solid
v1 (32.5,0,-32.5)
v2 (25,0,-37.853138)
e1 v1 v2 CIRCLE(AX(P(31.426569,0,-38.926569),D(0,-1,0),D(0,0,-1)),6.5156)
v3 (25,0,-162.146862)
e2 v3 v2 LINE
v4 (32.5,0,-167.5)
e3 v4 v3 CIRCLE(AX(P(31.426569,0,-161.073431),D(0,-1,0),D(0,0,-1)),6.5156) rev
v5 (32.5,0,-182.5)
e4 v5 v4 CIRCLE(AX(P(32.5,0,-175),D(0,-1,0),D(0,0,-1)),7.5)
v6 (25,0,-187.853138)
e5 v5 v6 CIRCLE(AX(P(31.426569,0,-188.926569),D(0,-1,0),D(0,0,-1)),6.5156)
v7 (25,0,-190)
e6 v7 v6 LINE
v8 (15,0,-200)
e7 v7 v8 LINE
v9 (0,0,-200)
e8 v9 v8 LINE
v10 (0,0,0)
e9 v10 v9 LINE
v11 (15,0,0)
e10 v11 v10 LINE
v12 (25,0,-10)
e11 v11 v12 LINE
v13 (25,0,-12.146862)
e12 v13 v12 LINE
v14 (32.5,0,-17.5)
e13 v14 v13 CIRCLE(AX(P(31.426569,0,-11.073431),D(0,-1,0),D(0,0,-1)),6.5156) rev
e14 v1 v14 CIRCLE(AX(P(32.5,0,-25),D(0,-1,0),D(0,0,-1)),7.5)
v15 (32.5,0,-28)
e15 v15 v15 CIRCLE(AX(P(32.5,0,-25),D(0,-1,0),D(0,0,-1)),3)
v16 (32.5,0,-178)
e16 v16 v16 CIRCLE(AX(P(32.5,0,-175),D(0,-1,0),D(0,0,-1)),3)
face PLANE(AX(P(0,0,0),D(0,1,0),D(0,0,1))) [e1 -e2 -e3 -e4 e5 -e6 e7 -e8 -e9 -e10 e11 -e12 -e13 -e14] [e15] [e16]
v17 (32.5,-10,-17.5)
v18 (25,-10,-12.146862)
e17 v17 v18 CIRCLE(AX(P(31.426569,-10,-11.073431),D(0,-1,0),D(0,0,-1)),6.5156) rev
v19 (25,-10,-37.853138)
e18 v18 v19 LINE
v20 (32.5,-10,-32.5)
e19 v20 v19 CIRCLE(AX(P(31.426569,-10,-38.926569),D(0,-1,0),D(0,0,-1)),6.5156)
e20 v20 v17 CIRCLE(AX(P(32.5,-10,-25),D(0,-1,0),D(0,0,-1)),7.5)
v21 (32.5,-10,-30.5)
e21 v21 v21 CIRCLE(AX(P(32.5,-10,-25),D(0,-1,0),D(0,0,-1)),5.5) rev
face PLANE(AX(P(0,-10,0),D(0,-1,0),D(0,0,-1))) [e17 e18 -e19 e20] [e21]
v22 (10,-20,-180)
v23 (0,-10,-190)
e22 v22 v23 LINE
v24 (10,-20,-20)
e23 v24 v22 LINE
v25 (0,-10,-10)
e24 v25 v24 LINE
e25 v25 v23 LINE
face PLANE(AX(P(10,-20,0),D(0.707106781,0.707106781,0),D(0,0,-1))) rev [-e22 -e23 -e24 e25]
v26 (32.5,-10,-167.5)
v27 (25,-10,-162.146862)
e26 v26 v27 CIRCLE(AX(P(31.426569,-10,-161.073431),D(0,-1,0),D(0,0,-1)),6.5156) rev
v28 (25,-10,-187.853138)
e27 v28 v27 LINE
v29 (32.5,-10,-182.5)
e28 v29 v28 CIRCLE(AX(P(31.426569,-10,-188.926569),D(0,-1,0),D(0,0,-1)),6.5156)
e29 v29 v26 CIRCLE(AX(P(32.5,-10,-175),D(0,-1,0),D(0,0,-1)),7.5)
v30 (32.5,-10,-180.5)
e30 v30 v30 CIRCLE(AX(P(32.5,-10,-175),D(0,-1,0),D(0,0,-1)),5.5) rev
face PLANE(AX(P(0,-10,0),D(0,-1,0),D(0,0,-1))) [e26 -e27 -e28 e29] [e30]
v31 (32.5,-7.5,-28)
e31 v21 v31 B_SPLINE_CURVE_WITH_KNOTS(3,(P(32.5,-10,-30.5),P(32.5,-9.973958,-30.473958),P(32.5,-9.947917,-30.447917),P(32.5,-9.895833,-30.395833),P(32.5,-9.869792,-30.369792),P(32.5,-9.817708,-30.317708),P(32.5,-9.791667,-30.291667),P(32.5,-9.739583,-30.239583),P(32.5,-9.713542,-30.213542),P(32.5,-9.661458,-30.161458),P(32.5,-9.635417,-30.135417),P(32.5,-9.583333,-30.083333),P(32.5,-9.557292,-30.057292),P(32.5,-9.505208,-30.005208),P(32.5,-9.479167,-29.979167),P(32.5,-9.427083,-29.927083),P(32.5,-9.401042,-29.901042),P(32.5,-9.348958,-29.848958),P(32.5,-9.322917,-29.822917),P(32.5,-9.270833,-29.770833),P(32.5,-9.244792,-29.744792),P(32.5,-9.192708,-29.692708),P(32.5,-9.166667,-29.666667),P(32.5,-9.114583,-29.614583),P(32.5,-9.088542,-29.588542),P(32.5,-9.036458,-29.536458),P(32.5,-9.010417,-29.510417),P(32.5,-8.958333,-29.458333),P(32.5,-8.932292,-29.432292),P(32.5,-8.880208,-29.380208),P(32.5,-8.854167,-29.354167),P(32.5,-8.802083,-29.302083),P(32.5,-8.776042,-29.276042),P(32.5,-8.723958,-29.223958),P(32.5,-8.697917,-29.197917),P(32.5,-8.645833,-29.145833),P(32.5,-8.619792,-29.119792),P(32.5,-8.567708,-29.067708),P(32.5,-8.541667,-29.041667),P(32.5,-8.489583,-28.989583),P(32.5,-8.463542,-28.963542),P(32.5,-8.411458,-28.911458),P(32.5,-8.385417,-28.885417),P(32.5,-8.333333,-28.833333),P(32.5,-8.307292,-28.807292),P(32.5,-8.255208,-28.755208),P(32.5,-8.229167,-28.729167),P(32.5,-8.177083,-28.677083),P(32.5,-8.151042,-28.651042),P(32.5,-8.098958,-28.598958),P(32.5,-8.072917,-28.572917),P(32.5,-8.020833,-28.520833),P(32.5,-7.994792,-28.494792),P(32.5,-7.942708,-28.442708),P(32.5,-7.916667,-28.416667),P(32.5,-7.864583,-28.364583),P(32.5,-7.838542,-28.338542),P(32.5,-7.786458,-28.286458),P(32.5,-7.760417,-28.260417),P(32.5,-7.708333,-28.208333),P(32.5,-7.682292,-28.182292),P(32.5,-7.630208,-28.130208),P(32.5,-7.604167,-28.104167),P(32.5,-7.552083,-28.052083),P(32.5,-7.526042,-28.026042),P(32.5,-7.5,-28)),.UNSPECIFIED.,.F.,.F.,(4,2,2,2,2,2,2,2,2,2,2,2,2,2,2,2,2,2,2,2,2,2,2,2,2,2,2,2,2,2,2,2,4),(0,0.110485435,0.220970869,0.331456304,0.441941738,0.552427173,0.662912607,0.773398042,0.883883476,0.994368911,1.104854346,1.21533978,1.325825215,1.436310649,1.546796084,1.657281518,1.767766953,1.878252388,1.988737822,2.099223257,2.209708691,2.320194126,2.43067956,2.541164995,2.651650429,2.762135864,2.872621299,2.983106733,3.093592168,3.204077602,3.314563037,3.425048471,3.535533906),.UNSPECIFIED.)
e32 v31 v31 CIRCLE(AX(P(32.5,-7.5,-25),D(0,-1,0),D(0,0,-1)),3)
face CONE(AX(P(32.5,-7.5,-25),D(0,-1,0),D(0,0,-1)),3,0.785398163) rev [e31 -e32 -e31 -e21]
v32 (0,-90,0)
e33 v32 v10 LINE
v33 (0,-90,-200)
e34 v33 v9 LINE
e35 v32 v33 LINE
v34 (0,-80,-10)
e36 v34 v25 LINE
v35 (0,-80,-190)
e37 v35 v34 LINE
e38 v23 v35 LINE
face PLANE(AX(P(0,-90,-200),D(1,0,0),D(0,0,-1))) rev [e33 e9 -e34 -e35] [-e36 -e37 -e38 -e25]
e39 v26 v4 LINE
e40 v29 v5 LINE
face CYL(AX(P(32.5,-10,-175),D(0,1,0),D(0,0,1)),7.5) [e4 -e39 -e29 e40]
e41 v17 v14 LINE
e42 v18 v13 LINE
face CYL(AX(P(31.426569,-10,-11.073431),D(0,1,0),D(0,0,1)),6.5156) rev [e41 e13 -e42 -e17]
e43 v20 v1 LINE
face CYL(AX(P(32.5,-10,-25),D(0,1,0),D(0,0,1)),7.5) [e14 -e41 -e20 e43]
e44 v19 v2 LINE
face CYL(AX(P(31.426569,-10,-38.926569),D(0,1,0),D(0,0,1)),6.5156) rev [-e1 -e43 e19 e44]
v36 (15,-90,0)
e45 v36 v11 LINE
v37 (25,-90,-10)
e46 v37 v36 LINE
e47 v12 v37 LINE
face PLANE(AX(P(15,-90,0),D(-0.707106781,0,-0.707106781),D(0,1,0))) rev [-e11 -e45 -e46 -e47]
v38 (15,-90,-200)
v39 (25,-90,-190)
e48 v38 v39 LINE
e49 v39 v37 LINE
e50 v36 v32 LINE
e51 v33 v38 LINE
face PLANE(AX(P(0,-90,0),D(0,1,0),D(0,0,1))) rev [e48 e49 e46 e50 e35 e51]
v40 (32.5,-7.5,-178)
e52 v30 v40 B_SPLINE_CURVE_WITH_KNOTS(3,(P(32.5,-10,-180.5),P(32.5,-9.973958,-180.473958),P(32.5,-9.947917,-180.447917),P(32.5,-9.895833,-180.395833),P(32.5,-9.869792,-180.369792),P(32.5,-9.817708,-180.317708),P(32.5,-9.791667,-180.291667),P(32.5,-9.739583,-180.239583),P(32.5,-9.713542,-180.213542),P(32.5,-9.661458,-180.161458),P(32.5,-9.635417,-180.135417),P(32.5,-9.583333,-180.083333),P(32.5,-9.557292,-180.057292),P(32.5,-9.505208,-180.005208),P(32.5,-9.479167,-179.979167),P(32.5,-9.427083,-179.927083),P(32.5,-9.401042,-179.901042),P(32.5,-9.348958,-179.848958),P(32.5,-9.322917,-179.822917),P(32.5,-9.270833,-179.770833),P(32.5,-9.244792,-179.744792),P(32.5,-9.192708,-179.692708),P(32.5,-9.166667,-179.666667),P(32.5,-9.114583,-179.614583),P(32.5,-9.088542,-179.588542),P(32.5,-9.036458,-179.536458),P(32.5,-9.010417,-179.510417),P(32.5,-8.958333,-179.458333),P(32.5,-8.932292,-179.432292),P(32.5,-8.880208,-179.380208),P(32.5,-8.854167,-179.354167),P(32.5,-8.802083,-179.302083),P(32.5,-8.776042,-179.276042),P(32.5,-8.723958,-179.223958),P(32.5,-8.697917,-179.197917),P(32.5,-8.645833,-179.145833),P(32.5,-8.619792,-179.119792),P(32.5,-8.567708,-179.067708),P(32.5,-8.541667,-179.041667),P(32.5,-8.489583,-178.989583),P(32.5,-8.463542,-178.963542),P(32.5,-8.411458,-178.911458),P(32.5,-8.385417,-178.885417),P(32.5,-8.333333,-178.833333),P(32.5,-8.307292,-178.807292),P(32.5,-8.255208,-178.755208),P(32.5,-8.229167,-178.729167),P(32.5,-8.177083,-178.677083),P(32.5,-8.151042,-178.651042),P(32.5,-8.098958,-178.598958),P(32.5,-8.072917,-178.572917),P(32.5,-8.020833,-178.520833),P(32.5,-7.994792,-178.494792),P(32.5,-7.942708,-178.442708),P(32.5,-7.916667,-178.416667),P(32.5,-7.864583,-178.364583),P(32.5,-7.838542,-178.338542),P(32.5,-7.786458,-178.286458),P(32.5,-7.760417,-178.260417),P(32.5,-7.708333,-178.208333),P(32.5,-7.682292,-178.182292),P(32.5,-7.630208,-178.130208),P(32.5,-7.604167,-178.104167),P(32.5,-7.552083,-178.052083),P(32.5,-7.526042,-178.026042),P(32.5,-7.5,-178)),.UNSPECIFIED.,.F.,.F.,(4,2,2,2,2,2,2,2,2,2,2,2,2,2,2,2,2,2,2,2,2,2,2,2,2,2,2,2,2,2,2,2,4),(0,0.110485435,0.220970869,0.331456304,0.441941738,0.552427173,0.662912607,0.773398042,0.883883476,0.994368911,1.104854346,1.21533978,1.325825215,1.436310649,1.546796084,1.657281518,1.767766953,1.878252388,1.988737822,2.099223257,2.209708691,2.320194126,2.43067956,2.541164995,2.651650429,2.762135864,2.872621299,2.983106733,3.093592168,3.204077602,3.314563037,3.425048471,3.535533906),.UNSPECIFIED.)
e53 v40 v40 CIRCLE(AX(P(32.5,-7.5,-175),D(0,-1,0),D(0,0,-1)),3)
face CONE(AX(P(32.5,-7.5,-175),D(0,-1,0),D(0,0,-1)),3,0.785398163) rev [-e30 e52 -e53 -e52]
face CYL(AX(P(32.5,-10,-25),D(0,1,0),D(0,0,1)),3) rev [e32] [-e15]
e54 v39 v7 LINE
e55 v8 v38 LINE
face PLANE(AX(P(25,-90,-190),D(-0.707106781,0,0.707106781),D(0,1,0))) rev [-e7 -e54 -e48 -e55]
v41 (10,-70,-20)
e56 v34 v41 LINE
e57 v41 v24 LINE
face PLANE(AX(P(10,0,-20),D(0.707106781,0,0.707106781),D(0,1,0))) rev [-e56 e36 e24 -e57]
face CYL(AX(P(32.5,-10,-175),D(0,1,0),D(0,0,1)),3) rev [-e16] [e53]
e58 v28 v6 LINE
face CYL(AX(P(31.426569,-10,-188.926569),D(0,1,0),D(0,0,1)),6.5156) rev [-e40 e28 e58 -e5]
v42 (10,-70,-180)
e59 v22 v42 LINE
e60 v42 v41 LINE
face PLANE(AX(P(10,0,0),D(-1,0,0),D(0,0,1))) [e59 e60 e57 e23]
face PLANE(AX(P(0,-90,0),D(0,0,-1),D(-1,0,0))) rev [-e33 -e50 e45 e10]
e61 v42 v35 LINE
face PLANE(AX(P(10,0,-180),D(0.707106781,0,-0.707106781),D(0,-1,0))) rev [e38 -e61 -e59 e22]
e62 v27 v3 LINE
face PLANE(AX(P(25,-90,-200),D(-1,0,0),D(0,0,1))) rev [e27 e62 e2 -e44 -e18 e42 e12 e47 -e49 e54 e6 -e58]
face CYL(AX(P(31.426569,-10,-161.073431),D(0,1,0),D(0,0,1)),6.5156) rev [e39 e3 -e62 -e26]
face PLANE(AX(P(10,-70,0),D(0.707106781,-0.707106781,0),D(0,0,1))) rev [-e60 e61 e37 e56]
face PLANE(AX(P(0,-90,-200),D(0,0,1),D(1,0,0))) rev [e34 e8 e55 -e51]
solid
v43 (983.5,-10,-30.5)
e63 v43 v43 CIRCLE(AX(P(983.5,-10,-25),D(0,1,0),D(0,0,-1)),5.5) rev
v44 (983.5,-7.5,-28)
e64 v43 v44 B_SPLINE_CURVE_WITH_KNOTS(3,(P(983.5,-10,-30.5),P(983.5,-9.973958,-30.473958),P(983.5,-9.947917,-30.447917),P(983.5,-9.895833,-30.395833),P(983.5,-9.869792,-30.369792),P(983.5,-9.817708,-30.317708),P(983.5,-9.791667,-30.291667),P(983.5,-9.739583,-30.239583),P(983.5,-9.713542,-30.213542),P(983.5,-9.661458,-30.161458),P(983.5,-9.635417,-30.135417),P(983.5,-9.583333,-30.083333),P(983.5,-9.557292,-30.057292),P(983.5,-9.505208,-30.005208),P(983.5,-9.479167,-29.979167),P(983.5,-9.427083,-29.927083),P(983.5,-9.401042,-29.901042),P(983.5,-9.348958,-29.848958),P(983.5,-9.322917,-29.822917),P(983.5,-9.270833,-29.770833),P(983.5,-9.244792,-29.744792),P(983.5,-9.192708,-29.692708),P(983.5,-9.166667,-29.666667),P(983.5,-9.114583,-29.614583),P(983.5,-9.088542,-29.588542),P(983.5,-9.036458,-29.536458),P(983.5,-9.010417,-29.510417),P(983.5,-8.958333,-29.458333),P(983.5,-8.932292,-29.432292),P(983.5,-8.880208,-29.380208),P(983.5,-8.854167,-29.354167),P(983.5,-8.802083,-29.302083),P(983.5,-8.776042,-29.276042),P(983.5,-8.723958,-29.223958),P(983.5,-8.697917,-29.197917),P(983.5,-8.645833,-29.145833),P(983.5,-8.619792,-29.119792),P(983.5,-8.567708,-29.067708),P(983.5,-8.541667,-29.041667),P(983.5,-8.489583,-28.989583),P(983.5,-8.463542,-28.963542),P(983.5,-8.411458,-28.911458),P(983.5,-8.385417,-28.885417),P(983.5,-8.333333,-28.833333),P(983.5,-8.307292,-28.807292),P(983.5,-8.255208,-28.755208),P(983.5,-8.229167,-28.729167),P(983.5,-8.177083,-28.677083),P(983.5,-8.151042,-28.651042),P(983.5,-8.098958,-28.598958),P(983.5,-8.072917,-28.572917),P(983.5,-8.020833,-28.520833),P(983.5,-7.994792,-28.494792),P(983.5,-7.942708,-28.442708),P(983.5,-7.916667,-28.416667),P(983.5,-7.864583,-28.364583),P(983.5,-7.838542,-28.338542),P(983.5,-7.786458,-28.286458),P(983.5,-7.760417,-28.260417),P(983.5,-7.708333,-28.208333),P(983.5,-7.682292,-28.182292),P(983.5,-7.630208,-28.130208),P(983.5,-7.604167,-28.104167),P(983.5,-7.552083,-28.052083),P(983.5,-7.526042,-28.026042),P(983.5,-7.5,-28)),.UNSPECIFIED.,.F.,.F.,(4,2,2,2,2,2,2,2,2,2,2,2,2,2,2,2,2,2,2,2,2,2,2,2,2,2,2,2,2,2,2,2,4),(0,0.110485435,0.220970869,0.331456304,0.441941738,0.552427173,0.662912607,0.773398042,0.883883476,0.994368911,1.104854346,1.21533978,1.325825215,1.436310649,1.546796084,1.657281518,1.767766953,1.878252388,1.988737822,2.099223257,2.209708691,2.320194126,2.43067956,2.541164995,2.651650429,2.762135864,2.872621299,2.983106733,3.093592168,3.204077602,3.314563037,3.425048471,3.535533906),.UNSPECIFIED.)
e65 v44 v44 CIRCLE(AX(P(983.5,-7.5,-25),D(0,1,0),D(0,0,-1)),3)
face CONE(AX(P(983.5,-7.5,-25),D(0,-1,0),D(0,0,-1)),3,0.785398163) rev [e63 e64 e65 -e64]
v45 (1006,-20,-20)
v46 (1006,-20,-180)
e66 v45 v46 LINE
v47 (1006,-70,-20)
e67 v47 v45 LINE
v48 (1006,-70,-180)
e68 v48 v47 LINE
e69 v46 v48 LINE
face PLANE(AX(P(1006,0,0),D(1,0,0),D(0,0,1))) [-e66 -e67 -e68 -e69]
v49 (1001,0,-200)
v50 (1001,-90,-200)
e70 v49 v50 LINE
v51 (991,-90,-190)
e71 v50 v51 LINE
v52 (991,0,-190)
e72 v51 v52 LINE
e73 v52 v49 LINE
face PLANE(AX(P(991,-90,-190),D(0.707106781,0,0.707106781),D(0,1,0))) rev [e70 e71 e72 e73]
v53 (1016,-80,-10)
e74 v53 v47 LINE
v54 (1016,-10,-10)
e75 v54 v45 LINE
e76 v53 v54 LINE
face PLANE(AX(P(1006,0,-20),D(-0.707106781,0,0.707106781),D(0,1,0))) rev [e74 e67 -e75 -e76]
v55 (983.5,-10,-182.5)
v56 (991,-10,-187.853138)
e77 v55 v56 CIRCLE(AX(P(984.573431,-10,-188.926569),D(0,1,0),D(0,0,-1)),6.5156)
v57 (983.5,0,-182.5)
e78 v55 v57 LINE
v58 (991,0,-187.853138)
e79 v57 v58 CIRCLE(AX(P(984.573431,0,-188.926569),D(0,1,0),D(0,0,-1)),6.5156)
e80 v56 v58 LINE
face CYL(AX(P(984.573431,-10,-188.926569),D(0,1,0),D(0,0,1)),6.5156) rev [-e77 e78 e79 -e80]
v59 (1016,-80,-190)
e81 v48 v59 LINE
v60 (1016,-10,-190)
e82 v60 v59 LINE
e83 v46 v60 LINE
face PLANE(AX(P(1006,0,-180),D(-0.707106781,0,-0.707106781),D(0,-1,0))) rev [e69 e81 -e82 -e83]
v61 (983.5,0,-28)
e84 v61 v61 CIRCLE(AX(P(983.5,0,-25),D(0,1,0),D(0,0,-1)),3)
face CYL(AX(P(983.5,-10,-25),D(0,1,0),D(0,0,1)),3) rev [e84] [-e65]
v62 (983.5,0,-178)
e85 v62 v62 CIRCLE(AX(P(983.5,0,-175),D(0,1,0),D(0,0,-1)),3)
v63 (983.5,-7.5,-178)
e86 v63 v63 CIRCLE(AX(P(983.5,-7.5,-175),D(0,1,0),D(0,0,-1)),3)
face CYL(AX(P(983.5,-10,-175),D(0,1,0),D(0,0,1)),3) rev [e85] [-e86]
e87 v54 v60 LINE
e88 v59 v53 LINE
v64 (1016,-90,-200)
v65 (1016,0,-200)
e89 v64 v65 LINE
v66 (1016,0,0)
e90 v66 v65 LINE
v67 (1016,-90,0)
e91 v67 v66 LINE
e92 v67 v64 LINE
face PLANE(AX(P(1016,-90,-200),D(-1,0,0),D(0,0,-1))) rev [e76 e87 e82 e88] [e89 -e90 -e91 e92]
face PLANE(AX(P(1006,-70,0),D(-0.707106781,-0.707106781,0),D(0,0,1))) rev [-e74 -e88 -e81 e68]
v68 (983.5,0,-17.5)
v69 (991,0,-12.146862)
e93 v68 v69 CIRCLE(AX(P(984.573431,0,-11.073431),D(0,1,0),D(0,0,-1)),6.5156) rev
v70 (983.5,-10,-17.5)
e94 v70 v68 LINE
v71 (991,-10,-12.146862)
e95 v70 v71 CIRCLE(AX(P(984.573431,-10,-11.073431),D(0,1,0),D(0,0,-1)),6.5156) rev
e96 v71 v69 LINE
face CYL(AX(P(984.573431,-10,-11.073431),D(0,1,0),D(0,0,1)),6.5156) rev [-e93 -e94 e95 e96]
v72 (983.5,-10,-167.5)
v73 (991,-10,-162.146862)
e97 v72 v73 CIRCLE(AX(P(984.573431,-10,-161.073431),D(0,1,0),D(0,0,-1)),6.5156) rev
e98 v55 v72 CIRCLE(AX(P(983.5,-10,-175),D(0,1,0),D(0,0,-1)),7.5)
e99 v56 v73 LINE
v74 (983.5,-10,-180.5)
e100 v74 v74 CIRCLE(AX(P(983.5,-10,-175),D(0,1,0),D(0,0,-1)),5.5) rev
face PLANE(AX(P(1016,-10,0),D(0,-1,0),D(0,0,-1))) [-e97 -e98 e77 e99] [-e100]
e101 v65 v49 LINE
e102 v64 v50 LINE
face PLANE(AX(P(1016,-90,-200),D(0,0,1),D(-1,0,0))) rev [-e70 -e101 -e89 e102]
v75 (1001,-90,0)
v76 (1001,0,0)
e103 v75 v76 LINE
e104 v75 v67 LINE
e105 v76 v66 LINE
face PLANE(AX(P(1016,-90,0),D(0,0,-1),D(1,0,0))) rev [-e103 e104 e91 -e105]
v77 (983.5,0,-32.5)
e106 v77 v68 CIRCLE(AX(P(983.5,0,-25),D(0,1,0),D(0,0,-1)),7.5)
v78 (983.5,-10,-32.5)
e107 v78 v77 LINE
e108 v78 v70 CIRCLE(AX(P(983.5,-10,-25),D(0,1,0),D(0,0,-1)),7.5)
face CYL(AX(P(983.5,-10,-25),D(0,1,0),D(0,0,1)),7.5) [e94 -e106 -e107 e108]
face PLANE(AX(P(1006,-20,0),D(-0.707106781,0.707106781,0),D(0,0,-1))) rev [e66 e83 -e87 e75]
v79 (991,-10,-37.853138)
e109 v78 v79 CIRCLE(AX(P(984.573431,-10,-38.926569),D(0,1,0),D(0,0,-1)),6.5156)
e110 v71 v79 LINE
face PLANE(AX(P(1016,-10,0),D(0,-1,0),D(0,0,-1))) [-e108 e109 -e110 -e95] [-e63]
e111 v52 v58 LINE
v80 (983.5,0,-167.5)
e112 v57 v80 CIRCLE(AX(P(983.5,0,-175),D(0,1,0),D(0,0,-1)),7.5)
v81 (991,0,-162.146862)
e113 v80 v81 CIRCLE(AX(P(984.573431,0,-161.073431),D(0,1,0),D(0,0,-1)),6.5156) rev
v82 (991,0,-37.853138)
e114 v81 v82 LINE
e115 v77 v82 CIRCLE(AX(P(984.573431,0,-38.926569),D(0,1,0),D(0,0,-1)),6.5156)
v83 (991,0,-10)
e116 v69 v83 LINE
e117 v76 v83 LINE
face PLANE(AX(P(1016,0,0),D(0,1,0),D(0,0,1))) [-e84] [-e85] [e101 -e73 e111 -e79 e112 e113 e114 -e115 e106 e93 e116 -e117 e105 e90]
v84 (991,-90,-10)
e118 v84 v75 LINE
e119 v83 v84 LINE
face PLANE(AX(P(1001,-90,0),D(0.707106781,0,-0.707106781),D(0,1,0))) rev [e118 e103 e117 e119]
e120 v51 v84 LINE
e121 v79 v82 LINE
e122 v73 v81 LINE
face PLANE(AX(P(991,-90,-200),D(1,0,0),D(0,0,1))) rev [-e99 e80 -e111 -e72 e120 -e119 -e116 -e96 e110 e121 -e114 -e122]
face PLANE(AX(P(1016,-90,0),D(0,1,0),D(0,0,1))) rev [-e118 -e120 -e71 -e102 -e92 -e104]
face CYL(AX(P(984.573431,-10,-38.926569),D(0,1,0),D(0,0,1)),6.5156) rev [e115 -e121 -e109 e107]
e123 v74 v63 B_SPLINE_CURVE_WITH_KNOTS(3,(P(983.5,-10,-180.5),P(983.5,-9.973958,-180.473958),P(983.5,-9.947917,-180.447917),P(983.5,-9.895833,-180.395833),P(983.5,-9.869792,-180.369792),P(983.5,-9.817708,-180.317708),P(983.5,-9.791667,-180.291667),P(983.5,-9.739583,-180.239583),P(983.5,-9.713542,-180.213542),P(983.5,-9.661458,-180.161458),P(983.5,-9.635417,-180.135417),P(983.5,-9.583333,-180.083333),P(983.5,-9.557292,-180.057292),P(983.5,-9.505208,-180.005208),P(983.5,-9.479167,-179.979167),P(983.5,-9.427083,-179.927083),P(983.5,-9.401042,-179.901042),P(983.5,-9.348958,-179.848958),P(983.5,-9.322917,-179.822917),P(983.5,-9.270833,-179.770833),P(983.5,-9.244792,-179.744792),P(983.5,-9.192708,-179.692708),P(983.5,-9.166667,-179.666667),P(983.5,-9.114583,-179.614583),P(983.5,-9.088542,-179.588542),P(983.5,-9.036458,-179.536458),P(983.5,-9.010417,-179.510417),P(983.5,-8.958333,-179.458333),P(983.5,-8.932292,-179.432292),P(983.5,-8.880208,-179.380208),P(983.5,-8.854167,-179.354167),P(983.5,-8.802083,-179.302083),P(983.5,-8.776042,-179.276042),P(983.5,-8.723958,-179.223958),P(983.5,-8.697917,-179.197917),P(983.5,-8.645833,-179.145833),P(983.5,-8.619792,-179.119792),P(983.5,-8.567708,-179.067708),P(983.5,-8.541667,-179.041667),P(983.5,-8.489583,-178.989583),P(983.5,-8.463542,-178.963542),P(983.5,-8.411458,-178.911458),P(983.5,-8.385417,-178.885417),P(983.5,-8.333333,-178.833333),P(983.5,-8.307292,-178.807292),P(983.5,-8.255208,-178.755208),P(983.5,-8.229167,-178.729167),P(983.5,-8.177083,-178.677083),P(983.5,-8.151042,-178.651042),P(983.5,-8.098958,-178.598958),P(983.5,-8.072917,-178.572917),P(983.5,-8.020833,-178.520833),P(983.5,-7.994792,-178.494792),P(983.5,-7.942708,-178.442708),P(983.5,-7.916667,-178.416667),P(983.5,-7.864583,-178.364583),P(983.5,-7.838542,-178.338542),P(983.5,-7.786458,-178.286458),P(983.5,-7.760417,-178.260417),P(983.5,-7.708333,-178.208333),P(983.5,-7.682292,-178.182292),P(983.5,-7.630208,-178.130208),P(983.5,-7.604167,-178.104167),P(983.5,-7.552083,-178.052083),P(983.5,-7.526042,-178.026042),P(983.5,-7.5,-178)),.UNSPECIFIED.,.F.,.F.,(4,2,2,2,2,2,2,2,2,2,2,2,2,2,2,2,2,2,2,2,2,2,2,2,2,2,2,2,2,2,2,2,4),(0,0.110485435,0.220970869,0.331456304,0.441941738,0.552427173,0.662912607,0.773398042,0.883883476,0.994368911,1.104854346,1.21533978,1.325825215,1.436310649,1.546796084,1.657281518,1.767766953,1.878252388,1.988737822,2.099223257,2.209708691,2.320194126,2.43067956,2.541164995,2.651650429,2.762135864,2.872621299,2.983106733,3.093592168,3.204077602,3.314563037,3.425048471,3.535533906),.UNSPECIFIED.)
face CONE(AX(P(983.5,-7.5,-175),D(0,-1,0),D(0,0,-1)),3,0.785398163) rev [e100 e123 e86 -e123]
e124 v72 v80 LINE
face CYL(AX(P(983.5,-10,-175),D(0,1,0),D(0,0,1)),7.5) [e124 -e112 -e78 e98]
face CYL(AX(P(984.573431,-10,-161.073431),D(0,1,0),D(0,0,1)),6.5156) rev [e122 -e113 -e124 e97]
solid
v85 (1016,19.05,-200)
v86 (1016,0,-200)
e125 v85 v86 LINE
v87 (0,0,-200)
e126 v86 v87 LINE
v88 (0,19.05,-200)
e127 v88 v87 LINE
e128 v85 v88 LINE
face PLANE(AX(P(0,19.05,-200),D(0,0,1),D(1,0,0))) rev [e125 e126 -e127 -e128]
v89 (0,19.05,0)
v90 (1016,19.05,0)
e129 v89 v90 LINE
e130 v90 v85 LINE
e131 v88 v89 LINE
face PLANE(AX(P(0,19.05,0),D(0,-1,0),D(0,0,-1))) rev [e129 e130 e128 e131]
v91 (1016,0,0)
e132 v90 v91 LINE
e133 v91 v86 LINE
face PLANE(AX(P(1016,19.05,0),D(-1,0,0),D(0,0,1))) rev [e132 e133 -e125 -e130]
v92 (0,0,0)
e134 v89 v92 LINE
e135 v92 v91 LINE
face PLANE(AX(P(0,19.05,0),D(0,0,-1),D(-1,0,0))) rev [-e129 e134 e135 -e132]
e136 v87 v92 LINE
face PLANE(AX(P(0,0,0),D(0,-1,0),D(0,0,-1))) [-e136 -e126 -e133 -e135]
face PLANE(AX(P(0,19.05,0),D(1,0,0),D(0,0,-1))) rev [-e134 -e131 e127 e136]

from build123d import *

# Parameters (mm, degrees)
SKETCH1_W             = 1016
SKETCH1_H             = 200
BOSS_EXTRUDE1_DEPTH   = 19.05
SKETCH2_W             = 25
SKETCH2_H             = 200
BOSS_EXTRUDE3_DEPTH   = 90
SKETCH8_W             = 180
SKETCH8_H             = 70
CUT_EXTRUDE5_DEPTH    = 10
CHAMFER2_SIZE         = 10
SKETCH10_R            = 3
BOSS_EXTRUDE6_DEPTH   = 10
BOSS_EXTRUDE6_2_DEPTH = 10
CHAMFER4_SIZE         = 2.5
CHAMFER5_SIZE         = 10


with BuildPart() as part:
    # Sketch1 → Boss-Extrude1 (new body)
    with BuildSketch(Plane(origin=(0, 0, 0), x_dir=(1, 0, 0), z_dir=(0, 1, 0))):
        with Locations((508, 100)):
            Rectangle(SKETCH1_W, SKETCH1_H)
    extrude(amount=BOSS_EXTRUDE1_DEPTH)


with BuildPart() as body_2:
    # Sketch2 → Boss-Extrude3 (new body)
    with BuildSketch(Plane.XZ):
        with Locations((12.5, -100)):
            Rectangle(SKETCH2_W, SKETCH2_H)
    extrude(amount=BOSS_EXTRUDE3_DEPTH)

    # Sketch8 → Cut-Extrude5 (cut)
    with BuildSketch(Plane.ZY):
        with Locations((-100, -45)):
            Rectangle(SKETCH8_W, SKETCH8_H)
    extrude(amount=-CUT_EXTRUDE5_DEPTH, mode=Mode.SUBTRACT)

    # Chamfer2
    chamfer2_edges = [body_2.edges().sort_by_distance(p)[0] for p in [
        (10, -80, -100),
        (10, -45, -190),
        (10, -10, -100),
        (10, -45, -10),
    ]]
    chamfer(chamfer2_edges, length=CHAMFER2_SIZE - 0.0001)  # a hair under: the kernel refuses the full size


with BuildPart() as body_3:
    # Sketch10 → Boss-Extrude6 (new body)
    with BuildSketch(Plane.XZ):
        with BuildLine():
            Line((25, -175), (25, -187.853138356))
            ThreePointArc((25, -187.853138356), (27.641328746, -183.623268319), (32.5, -182.5))
            ThreePointArc((32.5, -182.5), (40, -175), (32.5, -167.5))
            ThreePointArc((32.5, -167.5), (27.641328746, -166.376731681), (25, -162.146861644))
            Line((25, -162.146861644), (25, -175))
        make_face()
        with Locations(Location((32.5, -175, 0), (0, 0, 270))):
            Circle(SKETCH10_R, mode=Mode.SUBTRACT)
    extrude(amount=BOSS_EXTRUDE6_DEPTH)


with BuildPart() as body_4:
    # Sketch10 → Boss-Extrude6 2 (new body)
    with BuildSketch(Plane.XZ):
        with BuildLine():
            Line((25, -12.146861644), (25, -25))
            Line((25, -25), (25, -37.853138356))
            ThreePointArc((25, -37.853138356), (27.641328746, -33.623268319), (32.5, -32.5))
            ThreePointArc((32.5, -32.5), (40, -25), (32.5, -17.5))
            ThreePointArc((32.5, -17.5), (27.641328746, -16.376731681), (25, -12.146861644))
        make_face()
        with Locations(Location((32.5, -25, 0), (0, 0, 270))):
            Circle(SKETCH10_R, mode=Mode.SUBTRACT)
    extrude(amount=BOSS_EXTRUDE6_2_DEPTH)


with BuildPart() as body_2_1:
    add(body_2.part)

    # Combine2: union body 4, body 3
    add(body_4.part)
    add(body_3.part)

    # Chamfer4
    chamfer4_edges = [body_2_1.edges().sort_by_distance(p)[0] for p in [
        (32.5, -10, -22),
        (32.5, -10, -172),
    ]]
    chamfer(chamfer4_edges, length=CHAMFER4_SIZE)

    # Chamfer5
    chamfer5_edges = [body_2_1.edges().sort_by_distance(p)[0] for p in [
        (25, -45, 0),
        (25, -45, -200),
    ]]
    chamfer(chamfer5_edges, length=CHAMFER5_SIZE)


with BuildPart() as body_3_2:
    # Mirror1: mirrored copy
    add(body_2_1.part.mirror(Plane.ZY.offset(-508)))


solid = Compound([part.part, body_2_1.part, body_3_2.part])
